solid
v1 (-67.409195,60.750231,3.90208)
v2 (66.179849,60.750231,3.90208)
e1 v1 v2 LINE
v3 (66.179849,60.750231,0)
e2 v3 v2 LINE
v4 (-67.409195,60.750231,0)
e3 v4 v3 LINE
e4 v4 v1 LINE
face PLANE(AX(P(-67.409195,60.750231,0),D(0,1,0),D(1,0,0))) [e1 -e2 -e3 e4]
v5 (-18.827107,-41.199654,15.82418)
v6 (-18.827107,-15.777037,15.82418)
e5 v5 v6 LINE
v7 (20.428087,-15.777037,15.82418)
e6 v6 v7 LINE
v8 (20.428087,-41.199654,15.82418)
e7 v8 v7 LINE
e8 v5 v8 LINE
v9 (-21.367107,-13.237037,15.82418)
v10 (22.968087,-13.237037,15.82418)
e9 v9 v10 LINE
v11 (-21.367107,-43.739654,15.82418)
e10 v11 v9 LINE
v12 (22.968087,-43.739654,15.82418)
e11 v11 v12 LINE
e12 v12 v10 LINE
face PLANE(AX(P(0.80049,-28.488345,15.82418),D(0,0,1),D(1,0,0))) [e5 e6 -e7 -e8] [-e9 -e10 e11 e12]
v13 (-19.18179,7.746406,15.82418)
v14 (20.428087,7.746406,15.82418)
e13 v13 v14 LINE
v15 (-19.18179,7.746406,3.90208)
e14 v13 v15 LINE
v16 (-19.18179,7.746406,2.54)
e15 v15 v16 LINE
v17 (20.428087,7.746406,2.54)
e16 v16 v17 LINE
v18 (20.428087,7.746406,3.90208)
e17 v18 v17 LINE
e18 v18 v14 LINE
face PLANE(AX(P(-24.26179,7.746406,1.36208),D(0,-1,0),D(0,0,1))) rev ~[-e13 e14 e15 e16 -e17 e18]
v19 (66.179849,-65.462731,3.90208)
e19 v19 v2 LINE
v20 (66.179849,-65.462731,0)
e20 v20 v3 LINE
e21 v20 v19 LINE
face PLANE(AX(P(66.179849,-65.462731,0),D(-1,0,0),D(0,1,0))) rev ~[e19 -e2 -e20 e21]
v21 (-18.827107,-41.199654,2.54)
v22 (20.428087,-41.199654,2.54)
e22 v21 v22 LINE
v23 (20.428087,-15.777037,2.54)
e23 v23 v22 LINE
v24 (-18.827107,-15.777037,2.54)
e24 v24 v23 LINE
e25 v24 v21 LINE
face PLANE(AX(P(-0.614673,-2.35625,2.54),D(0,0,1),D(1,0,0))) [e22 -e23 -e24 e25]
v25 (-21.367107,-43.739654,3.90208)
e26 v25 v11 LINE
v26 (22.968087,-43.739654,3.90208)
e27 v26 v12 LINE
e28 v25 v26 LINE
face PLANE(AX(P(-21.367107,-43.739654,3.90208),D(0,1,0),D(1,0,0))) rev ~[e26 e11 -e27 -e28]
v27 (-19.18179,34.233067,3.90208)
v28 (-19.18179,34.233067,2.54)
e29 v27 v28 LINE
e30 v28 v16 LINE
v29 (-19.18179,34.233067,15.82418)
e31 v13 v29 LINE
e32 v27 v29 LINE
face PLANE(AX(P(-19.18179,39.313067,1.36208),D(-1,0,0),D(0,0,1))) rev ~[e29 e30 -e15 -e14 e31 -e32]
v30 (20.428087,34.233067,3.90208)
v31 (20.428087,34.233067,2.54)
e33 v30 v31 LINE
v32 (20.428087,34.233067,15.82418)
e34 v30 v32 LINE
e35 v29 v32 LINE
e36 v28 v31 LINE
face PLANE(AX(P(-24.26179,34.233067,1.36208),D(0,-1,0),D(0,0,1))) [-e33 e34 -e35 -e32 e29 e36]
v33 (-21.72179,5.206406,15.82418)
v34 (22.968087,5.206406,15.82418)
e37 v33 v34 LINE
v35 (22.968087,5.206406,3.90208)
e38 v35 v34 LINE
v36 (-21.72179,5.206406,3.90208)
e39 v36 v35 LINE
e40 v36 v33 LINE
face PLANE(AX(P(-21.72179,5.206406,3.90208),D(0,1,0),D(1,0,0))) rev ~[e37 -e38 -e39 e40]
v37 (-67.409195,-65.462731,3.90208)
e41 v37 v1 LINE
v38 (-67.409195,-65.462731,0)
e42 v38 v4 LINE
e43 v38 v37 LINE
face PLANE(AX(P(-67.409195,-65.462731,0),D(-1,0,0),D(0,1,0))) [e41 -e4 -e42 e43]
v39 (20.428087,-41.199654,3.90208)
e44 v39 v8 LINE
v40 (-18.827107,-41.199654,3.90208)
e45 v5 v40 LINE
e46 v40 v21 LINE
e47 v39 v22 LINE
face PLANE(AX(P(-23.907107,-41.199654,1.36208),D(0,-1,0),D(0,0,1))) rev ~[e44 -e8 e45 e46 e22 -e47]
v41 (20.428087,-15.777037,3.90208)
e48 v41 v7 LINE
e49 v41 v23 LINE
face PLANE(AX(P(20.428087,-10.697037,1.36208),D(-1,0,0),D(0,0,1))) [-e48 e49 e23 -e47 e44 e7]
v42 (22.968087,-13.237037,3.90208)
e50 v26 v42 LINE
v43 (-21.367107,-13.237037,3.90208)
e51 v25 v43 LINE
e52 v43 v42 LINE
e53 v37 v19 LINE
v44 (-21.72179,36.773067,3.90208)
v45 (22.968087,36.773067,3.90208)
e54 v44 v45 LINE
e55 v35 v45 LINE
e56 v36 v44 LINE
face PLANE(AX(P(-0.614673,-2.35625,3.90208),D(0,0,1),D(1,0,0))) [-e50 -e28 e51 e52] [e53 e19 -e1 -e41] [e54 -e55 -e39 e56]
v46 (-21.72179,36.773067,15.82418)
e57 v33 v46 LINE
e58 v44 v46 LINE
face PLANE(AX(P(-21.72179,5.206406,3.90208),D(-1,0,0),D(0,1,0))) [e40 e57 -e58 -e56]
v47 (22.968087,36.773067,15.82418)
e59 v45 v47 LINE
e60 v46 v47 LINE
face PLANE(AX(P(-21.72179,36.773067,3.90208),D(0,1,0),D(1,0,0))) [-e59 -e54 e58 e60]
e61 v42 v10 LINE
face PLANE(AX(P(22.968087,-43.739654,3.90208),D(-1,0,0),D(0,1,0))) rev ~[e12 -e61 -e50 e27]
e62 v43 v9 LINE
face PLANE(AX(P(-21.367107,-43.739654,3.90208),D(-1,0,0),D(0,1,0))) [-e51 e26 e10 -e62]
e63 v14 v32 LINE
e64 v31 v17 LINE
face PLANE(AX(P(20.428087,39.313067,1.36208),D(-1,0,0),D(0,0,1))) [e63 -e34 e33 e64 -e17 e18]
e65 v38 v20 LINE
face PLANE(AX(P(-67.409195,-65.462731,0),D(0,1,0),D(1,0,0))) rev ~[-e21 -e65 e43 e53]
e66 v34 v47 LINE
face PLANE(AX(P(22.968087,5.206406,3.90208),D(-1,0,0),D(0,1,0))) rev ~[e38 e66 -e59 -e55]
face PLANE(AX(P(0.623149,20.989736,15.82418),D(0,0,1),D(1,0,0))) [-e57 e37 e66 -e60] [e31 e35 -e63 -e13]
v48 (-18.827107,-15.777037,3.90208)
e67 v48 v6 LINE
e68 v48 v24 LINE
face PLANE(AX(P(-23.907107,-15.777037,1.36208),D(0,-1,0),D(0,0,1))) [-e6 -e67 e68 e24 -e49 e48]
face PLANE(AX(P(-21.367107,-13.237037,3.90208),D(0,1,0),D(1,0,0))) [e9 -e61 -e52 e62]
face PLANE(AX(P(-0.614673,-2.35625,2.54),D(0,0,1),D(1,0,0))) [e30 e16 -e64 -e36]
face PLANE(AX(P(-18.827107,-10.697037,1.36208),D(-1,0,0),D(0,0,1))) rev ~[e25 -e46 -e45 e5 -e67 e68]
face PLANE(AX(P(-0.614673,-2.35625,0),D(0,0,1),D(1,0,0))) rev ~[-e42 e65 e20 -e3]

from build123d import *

# Parameters (mm, degrees)
F0_W        = 133.5890442133
F0_H        = 126.2129619718
F1_DEPTH    = 3.90208
F2_W        = 44.6898769587
F2_H        = 31.5666613169
F2_W_2      = 44.3351939321
F2_H_2      = 30.5026173592
F3_DEPTH    = 11.9221
F4_T        = 2.54
F4_T3_DEPTH = 49.4151939321
F4_T5_DEPTH = 35.5826173592
F4_T7_DEPTH = 49.7698769587
F4_T9_DEPTH = 36.6466613169


# Not quite as in the source:
# - a shell that OpenCascade refuses in one call is made with other operations: the cavity is built on its own and cut out


with BuildPart() as f1:
    # F0 (on Top) → F1 (new body)
    with BuildSketch(Plane.XY):
        with Locations((-0.6146728992, -2.3562498391)):
            Rectangle(F0_W, F0_H)
    extrude(amount=F1_DEPTH)

    # F2 (on face) → F3 (join)
    with BuildSketch(Plane.XY.offset(3.90208)):
        with Locations((0.623148866, 20.9897363093)):
            Rectangle(F2_W, F2_H)
        with Locations((0.8004903793, -28.4883454442)):
            Rectangle(F2_W_2, F2_H_2)
    extrude(amount=F3_DEPTH)

    # F4: shell of thickness 2.54, made by hand


with BuildPart() as f4_core1:
    # F4_t2: copy of F1
    add(f1.part)

    # the walls: a layer under each face that stays
    f4_faces = [f4_core1.faces().sort_by_distance(p)[0] for p in [
        (-0.6146728992, 60.7502311468, 1.95104),
        (66.1798492074, -2.3562498391, 1.95104),
        (-67.4091950059, -2.3562498391, 1.95104),
        (-0.6146728992, -2.3562498391, 0),
        (-0.6146728992, -2.3562498391, 3.90208),
        (-0.6146728992, -65.4627308249, 1.95104),
        (0.8004903793, -13.2370367646, 9.86313),
        (-21.3671065867, -28.4883454442, 9.86313),
        (0.8004903793, -43.7396541238, 9.86313),
        (22.9680873454, -28.4883454442, 9.86313),
        (0.623148866, 36.7730669677, 9.86313),
        (-21.7217896134, 20.9897363093, 9.86313),
        (0.623148866, 5.2064056508, 9.86313),
        (22.9680873454, 20.9897363093, 9.86313),
    ]]
    thicken(f4_faces, amount=-F4_T, mode=Mode.SUBTRACT)

    # F4_s4 → F4_t3 (cut)
    with BuildSketch(Plane.YZ.offset(-23.9071065867)):
        Polygon((-13.2116367646, 3.92748), (-13.2370367646, 1.36208), (-15.7770367646, 1.36208), (-15.7770367646, 3.90208), align=None)
        Polygon((-43.7650541238, 3.92748), (-43.7396541238, 1.36208), (-41.1996541238, 1.36208), (-41.1996541238, 3.90208), align=None)
    extrude(amount=F4_T3_DEPTH, mode=Mode.SUBTRACT)

    # F4_s6 → F4_t5 (cut)
    with BuildSketch(Plane.XZ.offset(10.6970367646)):
        Polygon((-21.3925065867, 3.92748), (-21.3671065867, 1.36208), (-18.8271065867, 1.36208), (-18.8271065867, 3.90208), align=None)
        Polygon((22.9934873454, 3.92748), (22.9680873454, 1.36208), (20.4280873454, 1.36208), (20.4280873454, 3.90208), align=None)
    extrude(amount=F4_T5_DEPTH, mode=Mode.SUBTRACT)

    # F4_s8 → F4_t7 (cut)
    with BuildSketch(Plane.YZ.offset(-24.2617896134)):
        Polygon((36.7984669677, 3.92748), (36.7730669677, 1.36208), (34.2330669677, 1.36208), (34.2330669677, 3.90208), align=None)
        Polygon((5.1810056508, 3.92748), (5.2064056508, 1.36208), (7.7464056508, 1.36208), (7.7464056508, 3.90208), align=None)
    extrude(amount=F4_T7_DEPTH, mode=Mode.SUBTRACT)

    # F4_s10 → F4_t9 (cut)
    with BuildSketch(Plane.XZ.offset(-39.3130669677)):
        Polygon((-21.7471896134, 3.92748), (-21.7217896134, 1.36208), (-19.1817896134, 1.36208), (-19.1817896134, 3.90208), align=None)
        Polygon((22.9934873454, 3.92748), (22.9680873454, 1.36208), (20.4280873454, 1.36208), (20.4280873454, 3.90208), align=None)
    extrude(amount=F4_T9_DEPTH, mode=Mode.SUBTRACT)


with BuildPart() as f1_1:
    add(f1.part)

    # what is left inside the walls is the cavity
    f4_cavity = [f4_core1.part.solids().sort_by_distance(p)[0] for p in [
        (0.80049, -32.725448, 2.5654),
        (0.623149, 16.575293, 2.5654),
    ]]
    add(f4_cavity, mode=Mode.SUBTRACT)


solid = f1_1.part
